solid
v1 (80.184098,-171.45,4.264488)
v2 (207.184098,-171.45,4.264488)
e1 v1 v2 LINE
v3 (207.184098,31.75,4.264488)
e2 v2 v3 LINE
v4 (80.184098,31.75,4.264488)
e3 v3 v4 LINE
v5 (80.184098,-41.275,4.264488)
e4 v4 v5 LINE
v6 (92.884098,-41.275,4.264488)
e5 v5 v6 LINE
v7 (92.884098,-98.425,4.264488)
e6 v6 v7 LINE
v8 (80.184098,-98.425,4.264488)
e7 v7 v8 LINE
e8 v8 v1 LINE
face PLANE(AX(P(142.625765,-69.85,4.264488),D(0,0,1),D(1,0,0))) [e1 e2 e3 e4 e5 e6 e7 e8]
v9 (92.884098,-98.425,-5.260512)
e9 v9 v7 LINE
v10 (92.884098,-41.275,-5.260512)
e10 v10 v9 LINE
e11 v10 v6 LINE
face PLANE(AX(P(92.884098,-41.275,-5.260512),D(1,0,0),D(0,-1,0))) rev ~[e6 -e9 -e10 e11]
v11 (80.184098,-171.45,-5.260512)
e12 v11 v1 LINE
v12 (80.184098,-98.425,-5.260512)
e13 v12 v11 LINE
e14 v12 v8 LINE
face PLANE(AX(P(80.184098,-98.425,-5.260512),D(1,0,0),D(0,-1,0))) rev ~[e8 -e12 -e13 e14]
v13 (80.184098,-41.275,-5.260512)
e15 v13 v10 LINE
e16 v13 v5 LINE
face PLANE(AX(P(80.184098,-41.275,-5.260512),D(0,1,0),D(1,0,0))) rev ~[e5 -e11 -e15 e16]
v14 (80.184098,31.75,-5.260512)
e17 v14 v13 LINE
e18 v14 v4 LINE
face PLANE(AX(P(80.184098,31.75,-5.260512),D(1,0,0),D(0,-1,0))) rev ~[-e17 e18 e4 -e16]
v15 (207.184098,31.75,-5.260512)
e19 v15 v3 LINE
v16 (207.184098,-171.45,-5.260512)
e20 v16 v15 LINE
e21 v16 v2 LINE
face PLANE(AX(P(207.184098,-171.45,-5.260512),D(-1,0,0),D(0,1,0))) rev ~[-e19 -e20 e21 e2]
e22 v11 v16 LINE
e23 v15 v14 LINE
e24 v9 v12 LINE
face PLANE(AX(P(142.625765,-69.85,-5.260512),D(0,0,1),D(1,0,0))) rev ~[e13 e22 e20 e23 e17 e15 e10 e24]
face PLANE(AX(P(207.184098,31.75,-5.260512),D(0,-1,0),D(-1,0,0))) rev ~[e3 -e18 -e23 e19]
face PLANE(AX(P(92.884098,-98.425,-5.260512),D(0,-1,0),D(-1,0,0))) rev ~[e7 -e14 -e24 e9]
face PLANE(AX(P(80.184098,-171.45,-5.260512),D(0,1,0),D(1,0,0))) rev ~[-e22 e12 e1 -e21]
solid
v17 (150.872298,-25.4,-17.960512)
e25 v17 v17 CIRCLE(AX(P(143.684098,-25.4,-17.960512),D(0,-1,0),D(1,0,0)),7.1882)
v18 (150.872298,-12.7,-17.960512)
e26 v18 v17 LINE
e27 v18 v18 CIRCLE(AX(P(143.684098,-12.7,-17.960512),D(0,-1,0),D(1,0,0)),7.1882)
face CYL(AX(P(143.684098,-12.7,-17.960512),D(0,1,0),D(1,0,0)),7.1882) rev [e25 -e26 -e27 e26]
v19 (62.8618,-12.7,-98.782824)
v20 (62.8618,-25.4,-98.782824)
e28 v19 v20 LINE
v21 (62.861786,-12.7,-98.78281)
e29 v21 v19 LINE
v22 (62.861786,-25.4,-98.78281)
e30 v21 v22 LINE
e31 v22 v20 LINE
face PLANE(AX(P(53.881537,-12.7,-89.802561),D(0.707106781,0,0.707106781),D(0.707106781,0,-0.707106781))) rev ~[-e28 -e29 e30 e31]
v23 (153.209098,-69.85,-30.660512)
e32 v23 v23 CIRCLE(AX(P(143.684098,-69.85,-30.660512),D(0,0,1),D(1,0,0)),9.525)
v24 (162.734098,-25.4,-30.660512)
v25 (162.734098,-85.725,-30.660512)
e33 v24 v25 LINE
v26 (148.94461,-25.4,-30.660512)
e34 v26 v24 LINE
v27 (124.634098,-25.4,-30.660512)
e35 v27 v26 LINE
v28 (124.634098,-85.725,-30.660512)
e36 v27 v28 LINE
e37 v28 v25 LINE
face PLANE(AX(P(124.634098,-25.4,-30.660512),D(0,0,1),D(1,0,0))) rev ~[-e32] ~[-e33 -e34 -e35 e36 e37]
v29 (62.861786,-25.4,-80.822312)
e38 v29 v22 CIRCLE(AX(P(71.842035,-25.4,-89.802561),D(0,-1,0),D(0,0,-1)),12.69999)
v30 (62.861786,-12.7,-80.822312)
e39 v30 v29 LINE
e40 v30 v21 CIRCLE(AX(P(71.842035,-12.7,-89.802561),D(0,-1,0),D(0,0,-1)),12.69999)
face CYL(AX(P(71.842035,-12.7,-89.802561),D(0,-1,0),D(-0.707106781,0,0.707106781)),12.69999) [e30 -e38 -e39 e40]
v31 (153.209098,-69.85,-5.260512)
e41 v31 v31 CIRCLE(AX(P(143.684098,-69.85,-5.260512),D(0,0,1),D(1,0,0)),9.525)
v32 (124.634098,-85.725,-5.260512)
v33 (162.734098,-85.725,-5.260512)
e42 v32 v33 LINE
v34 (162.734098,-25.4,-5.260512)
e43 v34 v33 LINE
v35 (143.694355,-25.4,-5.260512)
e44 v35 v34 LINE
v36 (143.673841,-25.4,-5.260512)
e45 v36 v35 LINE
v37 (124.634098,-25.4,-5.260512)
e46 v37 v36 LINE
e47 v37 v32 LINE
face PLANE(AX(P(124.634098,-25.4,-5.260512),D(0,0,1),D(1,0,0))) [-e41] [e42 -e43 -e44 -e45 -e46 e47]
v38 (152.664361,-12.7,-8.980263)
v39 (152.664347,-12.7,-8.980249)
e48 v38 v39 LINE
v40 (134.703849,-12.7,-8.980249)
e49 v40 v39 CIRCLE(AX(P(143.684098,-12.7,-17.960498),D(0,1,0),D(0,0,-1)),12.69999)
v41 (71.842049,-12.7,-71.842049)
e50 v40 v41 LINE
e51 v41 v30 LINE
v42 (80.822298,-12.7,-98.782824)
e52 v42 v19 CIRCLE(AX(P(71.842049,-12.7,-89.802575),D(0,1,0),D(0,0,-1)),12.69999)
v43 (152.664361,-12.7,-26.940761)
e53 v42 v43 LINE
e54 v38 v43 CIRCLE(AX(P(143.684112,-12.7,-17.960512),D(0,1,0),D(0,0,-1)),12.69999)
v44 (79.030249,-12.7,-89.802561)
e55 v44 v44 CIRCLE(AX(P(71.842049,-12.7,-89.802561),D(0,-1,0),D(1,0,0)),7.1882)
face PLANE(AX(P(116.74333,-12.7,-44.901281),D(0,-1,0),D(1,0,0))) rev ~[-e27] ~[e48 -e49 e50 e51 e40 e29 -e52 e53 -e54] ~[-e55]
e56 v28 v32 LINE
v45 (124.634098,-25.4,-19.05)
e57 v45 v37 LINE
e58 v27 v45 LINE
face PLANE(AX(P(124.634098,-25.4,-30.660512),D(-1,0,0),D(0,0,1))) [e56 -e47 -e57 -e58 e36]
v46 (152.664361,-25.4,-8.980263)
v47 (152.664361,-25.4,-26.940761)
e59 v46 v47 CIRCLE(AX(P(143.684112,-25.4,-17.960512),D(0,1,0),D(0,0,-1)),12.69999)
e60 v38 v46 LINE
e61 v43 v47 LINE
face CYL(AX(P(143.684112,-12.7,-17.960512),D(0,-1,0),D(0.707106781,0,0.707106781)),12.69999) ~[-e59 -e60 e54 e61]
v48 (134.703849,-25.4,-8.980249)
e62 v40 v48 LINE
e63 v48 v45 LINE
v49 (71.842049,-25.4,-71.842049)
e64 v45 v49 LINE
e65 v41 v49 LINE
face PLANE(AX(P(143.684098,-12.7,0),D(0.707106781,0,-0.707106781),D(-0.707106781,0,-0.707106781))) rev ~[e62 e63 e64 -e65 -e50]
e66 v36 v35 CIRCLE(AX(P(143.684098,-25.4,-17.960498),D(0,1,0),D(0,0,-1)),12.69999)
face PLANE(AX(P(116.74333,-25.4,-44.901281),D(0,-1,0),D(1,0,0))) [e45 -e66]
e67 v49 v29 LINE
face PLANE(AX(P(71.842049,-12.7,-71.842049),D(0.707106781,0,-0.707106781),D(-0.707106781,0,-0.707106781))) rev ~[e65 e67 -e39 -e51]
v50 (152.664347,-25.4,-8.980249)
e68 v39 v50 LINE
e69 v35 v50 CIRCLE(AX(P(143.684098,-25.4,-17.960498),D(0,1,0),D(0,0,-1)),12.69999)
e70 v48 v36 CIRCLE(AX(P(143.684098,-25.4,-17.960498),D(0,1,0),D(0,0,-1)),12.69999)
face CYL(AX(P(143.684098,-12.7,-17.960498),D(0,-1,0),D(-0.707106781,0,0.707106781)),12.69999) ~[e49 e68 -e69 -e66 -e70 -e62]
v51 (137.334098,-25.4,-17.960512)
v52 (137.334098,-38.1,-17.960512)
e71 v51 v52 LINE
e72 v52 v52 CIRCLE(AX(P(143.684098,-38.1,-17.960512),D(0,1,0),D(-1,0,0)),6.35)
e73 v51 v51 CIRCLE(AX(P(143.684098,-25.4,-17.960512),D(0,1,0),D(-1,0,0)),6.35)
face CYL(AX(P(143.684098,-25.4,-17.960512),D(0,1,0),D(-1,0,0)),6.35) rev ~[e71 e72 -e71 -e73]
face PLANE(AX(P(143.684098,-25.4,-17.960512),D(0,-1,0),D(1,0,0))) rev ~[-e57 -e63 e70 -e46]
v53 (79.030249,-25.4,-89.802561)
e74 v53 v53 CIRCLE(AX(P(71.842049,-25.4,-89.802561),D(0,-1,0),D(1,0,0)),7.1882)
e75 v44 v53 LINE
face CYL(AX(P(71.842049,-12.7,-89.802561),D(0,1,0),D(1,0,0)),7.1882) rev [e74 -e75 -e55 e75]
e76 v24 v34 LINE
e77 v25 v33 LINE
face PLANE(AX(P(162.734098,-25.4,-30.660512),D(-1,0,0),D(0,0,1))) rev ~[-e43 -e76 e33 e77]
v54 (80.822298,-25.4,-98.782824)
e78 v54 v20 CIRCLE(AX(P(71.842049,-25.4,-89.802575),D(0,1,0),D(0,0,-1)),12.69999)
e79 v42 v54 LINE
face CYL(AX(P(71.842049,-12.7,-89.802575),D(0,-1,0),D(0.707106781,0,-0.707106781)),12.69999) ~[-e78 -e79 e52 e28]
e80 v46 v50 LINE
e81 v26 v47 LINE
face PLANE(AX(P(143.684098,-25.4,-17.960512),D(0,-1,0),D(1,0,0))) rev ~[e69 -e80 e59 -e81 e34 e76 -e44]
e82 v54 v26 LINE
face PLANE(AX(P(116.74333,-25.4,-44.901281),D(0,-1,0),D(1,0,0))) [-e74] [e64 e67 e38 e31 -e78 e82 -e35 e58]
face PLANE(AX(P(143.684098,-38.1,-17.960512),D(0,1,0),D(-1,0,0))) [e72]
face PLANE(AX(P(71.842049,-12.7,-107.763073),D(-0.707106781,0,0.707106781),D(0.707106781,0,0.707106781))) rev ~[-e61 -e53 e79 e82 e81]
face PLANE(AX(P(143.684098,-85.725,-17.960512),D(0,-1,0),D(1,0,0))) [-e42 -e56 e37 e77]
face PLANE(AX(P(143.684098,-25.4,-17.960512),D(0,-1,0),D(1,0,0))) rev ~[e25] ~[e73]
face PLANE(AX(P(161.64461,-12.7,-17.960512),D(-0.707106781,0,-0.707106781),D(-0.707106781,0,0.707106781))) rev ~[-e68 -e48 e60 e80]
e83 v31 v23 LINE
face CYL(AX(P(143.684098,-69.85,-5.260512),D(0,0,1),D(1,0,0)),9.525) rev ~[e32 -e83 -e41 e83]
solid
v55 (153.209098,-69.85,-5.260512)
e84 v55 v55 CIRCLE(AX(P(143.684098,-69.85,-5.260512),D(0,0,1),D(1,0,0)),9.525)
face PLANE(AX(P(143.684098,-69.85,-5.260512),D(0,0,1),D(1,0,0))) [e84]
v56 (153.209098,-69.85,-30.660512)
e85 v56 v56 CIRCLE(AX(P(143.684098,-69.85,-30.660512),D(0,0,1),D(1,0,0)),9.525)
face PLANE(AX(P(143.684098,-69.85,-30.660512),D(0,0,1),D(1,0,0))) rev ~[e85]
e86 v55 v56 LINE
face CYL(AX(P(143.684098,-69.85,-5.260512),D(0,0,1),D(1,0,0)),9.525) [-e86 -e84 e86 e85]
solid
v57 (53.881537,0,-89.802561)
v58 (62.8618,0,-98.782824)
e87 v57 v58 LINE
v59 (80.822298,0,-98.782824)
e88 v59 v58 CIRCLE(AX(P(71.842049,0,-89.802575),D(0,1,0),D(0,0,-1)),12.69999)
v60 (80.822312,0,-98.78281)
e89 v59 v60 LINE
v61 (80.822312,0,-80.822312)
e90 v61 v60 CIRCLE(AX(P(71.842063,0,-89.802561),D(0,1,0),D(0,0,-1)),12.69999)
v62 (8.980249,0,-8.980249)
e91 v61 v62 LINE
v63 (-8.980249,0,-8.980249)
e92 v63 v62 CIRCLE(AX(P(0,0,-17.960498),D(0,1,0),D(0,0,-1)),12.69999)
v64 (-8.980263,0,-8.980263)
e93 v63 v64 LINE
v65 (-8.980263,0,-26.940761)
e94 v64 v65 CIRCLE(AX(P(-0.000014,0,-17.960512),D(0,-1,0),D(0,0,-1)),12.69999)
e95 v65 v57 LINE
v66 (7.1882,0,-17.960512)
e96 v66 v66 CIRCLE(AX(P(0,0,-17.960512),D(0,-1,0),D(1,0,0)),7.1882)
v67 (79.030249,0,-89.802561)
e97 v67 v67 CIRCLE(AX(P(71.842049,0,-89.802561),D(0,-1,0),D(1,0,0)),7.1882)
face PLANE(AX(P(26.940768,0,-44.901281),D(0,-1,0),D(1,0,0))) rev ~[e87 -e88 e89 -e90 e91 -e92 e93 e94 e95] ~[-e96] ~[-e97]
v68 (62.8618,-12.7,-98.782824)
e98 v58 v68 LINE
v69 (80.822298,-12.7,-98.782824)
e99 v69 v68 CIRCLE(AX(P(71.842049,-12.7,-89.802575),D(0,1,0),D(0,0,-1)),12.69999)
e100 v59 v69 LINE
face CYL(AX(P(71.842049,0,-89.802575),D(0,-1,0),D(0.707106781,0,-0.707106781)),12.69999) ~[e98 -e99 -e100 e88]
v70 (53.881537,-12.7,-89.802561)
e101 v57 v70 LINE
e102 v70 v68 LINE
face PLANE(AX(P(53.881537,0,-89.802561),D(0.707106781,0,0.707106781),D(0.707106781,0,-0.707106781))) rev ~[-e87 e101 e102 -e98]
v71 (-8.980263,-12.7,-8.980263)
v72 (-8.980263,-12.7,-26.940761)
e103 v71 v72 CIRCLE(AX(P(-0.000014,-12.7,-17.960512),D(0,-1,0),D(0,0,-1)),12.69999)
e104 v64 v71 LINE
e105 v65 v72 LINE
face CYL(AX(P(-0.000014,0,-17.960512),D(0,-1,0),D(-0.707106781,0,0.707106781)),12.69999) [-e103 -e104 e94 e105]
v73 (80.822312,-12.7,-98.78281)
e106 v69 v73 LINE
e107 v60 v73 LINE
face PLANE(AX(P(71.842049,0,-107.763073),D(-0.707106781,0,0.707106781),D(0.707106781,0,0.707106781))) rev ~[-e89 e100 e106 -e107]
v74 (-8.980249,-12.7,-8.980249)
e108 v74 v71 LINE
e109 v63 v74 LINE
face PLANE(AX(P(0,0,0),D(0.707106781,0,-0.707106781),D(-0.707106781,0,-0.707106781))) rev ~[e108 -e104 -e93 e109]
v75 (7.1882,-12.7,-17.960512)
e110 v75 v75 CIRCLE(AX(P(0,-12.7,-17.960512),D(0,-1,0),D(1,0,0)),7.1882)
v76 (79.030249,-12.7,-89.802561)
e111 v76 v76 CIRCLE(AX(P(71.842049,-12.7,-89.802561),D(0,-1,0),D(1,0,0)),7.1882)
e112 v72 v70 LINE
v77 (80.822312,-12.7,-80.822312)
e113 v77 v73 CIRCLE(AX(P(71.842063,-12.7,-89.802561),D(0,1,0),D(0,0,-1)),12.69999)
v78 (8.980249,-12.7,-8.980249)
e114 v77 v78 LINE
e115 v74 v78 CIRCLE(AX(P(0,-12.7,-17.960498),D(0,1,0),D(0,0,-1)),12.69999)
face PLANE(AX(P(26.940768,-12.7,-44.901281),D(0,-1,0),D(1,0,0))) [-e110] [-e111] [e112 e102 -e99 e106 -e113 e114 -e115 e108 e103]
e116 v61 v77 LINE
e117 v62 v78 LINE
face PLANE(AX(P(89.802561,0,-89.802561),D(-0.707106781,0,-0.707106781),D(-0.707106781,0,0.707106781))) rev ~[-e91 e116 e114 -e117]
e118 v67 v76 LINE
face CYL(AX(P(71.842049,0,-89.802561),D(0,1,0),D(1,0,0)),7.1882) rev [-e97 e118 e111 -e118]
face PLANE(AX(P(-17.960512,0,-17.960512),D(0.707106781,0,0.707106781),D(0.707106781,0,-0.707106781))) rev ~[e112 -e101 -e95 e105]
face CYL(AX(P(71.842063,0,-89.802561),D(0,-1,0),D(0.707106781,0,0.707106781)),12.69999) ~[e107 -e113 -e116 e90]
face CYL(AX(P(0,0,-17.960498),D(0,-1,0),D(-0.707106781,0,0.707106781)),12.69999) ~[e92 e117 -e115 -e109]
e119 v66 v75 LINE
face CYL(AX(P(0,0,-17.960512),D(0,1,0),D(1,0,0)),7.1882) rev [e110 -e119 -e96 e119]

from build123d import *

# Parameters (mm, degrees)
F0_R      = 7.1882
F1_DEPTH  = 12.7
F2_START  = 12.7
F2_DEPTH  = 12.7
F3_R      = 12.69999
F3_2_R    = 12.69999
F5_START  = 25.4
F4_W      = 38.1
F4_H      = 25.4
F5_DEPTH  = 60.325
F6_DEPTH  = 19.05
F7_R      = 9.525
F8_DEPTH  = 25.4
F9_R      = 6.35
F10_DEPTH = 12.7
F12_DEPTH = 9.525
F13_DEPTH = 25.4


# Not quite as in the source:
# - a fillet or chamfer is up to 0.001 mm smaller than in the source, because OpenCascade refuses the exact size


with BuildPart() as f1:
    # F0 (on Front) → F1 (new body)
    with BuildSketch(Plane.XZ):
        Polygon((71.8420489686, -71.8420489686), (0, 0), (-17.9605122421, -17.9605122421), (53.8815367264, -89.8025612107), align=None)
        with Locations((0, -17.9605122421)):
            Circle(F0_R, mode=Mode.SUBTRACT)
        Polygon((89.8025612107, -89.8025612107), (71.8420489686, -71.8420489686), (53.8815367264, -89.8025612107), (71.8420489686, -107.7630734528), align=None)
        with Locations((71.8420489686, -89.8025612107)):
            Circle(F0_R, mode=Mode.SUBTRACT)
    extrude(amount=F1_DEPTH)

    # F3#2 (radius 12.7 in the source; OpenCascade refuses exactly that, so slightly less here)
    f3_2_edges = [f1.edges().sort_by_distance(p)[0] for p in [
        (89.802561, -6.35, -89.802561),
        (71.842049, -6.35, -107.763073),
        (0, -6.35, 0),
        (-17.960512, -6.35, -17.960512),
    ]]
    fillet(f3_2_edges, radius=F3_2_R)

    # F0 (on Front) → F6 (cut)
    with BuildSketch(Plane.XZ):
        with Locations((143.6840979371, -17.9605122421)):
            Circle(F0_R)
    extrude(amount=-F6_DEPTH, mode=Mode.SUBTRACT)


with BuildPart() as f2:
    # F0 (on Front) → F2 (new body)
    with BuildSketch(Plane.XZ.offset(F2_START)):
        Polygon((143.6840979371, 0), (71.8420489686, -71.8420489686), (89.8025612107, -89.8025612107), (161.6446101792, -17.9605122421), align=None)
        with Locations((143.6840979371, -17.9605122421)):
            Circle(F0_R, mode=Mode.SUBTRACT)
        Polygon((89.8025612107, -89.8025612107), (71.8420489686, -71.8420489686), (53.8815367264, -89.8025612107), (71.8420489686, -107.7630734528), align=None)
        with Locations((71.8420489686, -89.8025612107)):
            Circle(F0_R, mode=Mode.SUBTRACT)
    extrude(amount=F2_DEPTH)

    # F3 (radius 12.7 in the source; OpenCascade refuses exactly that, so slightly less here)
    f3_edges = [f2.edges().sort_by_distance(p)[0] for p in [
        (143.684098, -19.05, 0),
        (161.64461, -19.05, -17.960512),
        (53.881537, -19.05, -89.802561),
        (71.842049, -19.05, -107.763073),
    ]]
    fillet(f3_edges, radius=F3_R)

    # F4 (on face) → F5 (join)
    with BuildSketch(Plane.XZ.offset(F5_START)):
        with Locations((143.6840979371, -17.9605122421)):
            Rectangle(F4_W, F4_H)
    extrude(amount=F5_DEPTH)

    # F7 (on face) → F8 (cut)
    with BuildSketch(Plane.XY.offset(-5.2605122421)):
        with Locations((143.6840979371, -69.85)):
            Circle(F7_R)
    extrude(amount=-F8_DEPTH, mode=Mode.SUBTRACT)

    # F9 (on face) → F10 (cut)
    with BuildSketch(Plane(origin=(0, -25.4, 0), x_dir=(-1, 0, 0), z_dir=(0, 1, 0))):
        with Locations((-143.6840979371, -17.9605122421)):
            Circle(F9_R)
    extrude(amount=-F10_DEPTH, mode=Mode.SUBTRACT)


with BuildPart() as f12:
    # F11 (on face) → F12 (new body)
    with BuildSketch(Plane.XY.offset(-5.2605122421)):
        Polygon((80.1840979371, -98.425), (80.1840979371, -171.45), (207.1840979371, -171.45), (207.1840979371, 31.75), (80.1840979371, 31.75), (80.1840979371, -41.275), (92.8840979371, -41.275), (92.8840979371, -98.425), align=None)
    extrude(amount=F12_DEPTH)


with BuildPart() as f13:
    # F7 (on face) → F13 (new body)
    with BuildSketch(Plane.XY.offset(-5.2605122421)):
        with Locations((143.6840979371, -69.85)):
            Circle(F7_R)
    extrude(amount=-F13_DEPTH)


solid = Compound([f1.part, f2.part, f12.part, f13.part])
